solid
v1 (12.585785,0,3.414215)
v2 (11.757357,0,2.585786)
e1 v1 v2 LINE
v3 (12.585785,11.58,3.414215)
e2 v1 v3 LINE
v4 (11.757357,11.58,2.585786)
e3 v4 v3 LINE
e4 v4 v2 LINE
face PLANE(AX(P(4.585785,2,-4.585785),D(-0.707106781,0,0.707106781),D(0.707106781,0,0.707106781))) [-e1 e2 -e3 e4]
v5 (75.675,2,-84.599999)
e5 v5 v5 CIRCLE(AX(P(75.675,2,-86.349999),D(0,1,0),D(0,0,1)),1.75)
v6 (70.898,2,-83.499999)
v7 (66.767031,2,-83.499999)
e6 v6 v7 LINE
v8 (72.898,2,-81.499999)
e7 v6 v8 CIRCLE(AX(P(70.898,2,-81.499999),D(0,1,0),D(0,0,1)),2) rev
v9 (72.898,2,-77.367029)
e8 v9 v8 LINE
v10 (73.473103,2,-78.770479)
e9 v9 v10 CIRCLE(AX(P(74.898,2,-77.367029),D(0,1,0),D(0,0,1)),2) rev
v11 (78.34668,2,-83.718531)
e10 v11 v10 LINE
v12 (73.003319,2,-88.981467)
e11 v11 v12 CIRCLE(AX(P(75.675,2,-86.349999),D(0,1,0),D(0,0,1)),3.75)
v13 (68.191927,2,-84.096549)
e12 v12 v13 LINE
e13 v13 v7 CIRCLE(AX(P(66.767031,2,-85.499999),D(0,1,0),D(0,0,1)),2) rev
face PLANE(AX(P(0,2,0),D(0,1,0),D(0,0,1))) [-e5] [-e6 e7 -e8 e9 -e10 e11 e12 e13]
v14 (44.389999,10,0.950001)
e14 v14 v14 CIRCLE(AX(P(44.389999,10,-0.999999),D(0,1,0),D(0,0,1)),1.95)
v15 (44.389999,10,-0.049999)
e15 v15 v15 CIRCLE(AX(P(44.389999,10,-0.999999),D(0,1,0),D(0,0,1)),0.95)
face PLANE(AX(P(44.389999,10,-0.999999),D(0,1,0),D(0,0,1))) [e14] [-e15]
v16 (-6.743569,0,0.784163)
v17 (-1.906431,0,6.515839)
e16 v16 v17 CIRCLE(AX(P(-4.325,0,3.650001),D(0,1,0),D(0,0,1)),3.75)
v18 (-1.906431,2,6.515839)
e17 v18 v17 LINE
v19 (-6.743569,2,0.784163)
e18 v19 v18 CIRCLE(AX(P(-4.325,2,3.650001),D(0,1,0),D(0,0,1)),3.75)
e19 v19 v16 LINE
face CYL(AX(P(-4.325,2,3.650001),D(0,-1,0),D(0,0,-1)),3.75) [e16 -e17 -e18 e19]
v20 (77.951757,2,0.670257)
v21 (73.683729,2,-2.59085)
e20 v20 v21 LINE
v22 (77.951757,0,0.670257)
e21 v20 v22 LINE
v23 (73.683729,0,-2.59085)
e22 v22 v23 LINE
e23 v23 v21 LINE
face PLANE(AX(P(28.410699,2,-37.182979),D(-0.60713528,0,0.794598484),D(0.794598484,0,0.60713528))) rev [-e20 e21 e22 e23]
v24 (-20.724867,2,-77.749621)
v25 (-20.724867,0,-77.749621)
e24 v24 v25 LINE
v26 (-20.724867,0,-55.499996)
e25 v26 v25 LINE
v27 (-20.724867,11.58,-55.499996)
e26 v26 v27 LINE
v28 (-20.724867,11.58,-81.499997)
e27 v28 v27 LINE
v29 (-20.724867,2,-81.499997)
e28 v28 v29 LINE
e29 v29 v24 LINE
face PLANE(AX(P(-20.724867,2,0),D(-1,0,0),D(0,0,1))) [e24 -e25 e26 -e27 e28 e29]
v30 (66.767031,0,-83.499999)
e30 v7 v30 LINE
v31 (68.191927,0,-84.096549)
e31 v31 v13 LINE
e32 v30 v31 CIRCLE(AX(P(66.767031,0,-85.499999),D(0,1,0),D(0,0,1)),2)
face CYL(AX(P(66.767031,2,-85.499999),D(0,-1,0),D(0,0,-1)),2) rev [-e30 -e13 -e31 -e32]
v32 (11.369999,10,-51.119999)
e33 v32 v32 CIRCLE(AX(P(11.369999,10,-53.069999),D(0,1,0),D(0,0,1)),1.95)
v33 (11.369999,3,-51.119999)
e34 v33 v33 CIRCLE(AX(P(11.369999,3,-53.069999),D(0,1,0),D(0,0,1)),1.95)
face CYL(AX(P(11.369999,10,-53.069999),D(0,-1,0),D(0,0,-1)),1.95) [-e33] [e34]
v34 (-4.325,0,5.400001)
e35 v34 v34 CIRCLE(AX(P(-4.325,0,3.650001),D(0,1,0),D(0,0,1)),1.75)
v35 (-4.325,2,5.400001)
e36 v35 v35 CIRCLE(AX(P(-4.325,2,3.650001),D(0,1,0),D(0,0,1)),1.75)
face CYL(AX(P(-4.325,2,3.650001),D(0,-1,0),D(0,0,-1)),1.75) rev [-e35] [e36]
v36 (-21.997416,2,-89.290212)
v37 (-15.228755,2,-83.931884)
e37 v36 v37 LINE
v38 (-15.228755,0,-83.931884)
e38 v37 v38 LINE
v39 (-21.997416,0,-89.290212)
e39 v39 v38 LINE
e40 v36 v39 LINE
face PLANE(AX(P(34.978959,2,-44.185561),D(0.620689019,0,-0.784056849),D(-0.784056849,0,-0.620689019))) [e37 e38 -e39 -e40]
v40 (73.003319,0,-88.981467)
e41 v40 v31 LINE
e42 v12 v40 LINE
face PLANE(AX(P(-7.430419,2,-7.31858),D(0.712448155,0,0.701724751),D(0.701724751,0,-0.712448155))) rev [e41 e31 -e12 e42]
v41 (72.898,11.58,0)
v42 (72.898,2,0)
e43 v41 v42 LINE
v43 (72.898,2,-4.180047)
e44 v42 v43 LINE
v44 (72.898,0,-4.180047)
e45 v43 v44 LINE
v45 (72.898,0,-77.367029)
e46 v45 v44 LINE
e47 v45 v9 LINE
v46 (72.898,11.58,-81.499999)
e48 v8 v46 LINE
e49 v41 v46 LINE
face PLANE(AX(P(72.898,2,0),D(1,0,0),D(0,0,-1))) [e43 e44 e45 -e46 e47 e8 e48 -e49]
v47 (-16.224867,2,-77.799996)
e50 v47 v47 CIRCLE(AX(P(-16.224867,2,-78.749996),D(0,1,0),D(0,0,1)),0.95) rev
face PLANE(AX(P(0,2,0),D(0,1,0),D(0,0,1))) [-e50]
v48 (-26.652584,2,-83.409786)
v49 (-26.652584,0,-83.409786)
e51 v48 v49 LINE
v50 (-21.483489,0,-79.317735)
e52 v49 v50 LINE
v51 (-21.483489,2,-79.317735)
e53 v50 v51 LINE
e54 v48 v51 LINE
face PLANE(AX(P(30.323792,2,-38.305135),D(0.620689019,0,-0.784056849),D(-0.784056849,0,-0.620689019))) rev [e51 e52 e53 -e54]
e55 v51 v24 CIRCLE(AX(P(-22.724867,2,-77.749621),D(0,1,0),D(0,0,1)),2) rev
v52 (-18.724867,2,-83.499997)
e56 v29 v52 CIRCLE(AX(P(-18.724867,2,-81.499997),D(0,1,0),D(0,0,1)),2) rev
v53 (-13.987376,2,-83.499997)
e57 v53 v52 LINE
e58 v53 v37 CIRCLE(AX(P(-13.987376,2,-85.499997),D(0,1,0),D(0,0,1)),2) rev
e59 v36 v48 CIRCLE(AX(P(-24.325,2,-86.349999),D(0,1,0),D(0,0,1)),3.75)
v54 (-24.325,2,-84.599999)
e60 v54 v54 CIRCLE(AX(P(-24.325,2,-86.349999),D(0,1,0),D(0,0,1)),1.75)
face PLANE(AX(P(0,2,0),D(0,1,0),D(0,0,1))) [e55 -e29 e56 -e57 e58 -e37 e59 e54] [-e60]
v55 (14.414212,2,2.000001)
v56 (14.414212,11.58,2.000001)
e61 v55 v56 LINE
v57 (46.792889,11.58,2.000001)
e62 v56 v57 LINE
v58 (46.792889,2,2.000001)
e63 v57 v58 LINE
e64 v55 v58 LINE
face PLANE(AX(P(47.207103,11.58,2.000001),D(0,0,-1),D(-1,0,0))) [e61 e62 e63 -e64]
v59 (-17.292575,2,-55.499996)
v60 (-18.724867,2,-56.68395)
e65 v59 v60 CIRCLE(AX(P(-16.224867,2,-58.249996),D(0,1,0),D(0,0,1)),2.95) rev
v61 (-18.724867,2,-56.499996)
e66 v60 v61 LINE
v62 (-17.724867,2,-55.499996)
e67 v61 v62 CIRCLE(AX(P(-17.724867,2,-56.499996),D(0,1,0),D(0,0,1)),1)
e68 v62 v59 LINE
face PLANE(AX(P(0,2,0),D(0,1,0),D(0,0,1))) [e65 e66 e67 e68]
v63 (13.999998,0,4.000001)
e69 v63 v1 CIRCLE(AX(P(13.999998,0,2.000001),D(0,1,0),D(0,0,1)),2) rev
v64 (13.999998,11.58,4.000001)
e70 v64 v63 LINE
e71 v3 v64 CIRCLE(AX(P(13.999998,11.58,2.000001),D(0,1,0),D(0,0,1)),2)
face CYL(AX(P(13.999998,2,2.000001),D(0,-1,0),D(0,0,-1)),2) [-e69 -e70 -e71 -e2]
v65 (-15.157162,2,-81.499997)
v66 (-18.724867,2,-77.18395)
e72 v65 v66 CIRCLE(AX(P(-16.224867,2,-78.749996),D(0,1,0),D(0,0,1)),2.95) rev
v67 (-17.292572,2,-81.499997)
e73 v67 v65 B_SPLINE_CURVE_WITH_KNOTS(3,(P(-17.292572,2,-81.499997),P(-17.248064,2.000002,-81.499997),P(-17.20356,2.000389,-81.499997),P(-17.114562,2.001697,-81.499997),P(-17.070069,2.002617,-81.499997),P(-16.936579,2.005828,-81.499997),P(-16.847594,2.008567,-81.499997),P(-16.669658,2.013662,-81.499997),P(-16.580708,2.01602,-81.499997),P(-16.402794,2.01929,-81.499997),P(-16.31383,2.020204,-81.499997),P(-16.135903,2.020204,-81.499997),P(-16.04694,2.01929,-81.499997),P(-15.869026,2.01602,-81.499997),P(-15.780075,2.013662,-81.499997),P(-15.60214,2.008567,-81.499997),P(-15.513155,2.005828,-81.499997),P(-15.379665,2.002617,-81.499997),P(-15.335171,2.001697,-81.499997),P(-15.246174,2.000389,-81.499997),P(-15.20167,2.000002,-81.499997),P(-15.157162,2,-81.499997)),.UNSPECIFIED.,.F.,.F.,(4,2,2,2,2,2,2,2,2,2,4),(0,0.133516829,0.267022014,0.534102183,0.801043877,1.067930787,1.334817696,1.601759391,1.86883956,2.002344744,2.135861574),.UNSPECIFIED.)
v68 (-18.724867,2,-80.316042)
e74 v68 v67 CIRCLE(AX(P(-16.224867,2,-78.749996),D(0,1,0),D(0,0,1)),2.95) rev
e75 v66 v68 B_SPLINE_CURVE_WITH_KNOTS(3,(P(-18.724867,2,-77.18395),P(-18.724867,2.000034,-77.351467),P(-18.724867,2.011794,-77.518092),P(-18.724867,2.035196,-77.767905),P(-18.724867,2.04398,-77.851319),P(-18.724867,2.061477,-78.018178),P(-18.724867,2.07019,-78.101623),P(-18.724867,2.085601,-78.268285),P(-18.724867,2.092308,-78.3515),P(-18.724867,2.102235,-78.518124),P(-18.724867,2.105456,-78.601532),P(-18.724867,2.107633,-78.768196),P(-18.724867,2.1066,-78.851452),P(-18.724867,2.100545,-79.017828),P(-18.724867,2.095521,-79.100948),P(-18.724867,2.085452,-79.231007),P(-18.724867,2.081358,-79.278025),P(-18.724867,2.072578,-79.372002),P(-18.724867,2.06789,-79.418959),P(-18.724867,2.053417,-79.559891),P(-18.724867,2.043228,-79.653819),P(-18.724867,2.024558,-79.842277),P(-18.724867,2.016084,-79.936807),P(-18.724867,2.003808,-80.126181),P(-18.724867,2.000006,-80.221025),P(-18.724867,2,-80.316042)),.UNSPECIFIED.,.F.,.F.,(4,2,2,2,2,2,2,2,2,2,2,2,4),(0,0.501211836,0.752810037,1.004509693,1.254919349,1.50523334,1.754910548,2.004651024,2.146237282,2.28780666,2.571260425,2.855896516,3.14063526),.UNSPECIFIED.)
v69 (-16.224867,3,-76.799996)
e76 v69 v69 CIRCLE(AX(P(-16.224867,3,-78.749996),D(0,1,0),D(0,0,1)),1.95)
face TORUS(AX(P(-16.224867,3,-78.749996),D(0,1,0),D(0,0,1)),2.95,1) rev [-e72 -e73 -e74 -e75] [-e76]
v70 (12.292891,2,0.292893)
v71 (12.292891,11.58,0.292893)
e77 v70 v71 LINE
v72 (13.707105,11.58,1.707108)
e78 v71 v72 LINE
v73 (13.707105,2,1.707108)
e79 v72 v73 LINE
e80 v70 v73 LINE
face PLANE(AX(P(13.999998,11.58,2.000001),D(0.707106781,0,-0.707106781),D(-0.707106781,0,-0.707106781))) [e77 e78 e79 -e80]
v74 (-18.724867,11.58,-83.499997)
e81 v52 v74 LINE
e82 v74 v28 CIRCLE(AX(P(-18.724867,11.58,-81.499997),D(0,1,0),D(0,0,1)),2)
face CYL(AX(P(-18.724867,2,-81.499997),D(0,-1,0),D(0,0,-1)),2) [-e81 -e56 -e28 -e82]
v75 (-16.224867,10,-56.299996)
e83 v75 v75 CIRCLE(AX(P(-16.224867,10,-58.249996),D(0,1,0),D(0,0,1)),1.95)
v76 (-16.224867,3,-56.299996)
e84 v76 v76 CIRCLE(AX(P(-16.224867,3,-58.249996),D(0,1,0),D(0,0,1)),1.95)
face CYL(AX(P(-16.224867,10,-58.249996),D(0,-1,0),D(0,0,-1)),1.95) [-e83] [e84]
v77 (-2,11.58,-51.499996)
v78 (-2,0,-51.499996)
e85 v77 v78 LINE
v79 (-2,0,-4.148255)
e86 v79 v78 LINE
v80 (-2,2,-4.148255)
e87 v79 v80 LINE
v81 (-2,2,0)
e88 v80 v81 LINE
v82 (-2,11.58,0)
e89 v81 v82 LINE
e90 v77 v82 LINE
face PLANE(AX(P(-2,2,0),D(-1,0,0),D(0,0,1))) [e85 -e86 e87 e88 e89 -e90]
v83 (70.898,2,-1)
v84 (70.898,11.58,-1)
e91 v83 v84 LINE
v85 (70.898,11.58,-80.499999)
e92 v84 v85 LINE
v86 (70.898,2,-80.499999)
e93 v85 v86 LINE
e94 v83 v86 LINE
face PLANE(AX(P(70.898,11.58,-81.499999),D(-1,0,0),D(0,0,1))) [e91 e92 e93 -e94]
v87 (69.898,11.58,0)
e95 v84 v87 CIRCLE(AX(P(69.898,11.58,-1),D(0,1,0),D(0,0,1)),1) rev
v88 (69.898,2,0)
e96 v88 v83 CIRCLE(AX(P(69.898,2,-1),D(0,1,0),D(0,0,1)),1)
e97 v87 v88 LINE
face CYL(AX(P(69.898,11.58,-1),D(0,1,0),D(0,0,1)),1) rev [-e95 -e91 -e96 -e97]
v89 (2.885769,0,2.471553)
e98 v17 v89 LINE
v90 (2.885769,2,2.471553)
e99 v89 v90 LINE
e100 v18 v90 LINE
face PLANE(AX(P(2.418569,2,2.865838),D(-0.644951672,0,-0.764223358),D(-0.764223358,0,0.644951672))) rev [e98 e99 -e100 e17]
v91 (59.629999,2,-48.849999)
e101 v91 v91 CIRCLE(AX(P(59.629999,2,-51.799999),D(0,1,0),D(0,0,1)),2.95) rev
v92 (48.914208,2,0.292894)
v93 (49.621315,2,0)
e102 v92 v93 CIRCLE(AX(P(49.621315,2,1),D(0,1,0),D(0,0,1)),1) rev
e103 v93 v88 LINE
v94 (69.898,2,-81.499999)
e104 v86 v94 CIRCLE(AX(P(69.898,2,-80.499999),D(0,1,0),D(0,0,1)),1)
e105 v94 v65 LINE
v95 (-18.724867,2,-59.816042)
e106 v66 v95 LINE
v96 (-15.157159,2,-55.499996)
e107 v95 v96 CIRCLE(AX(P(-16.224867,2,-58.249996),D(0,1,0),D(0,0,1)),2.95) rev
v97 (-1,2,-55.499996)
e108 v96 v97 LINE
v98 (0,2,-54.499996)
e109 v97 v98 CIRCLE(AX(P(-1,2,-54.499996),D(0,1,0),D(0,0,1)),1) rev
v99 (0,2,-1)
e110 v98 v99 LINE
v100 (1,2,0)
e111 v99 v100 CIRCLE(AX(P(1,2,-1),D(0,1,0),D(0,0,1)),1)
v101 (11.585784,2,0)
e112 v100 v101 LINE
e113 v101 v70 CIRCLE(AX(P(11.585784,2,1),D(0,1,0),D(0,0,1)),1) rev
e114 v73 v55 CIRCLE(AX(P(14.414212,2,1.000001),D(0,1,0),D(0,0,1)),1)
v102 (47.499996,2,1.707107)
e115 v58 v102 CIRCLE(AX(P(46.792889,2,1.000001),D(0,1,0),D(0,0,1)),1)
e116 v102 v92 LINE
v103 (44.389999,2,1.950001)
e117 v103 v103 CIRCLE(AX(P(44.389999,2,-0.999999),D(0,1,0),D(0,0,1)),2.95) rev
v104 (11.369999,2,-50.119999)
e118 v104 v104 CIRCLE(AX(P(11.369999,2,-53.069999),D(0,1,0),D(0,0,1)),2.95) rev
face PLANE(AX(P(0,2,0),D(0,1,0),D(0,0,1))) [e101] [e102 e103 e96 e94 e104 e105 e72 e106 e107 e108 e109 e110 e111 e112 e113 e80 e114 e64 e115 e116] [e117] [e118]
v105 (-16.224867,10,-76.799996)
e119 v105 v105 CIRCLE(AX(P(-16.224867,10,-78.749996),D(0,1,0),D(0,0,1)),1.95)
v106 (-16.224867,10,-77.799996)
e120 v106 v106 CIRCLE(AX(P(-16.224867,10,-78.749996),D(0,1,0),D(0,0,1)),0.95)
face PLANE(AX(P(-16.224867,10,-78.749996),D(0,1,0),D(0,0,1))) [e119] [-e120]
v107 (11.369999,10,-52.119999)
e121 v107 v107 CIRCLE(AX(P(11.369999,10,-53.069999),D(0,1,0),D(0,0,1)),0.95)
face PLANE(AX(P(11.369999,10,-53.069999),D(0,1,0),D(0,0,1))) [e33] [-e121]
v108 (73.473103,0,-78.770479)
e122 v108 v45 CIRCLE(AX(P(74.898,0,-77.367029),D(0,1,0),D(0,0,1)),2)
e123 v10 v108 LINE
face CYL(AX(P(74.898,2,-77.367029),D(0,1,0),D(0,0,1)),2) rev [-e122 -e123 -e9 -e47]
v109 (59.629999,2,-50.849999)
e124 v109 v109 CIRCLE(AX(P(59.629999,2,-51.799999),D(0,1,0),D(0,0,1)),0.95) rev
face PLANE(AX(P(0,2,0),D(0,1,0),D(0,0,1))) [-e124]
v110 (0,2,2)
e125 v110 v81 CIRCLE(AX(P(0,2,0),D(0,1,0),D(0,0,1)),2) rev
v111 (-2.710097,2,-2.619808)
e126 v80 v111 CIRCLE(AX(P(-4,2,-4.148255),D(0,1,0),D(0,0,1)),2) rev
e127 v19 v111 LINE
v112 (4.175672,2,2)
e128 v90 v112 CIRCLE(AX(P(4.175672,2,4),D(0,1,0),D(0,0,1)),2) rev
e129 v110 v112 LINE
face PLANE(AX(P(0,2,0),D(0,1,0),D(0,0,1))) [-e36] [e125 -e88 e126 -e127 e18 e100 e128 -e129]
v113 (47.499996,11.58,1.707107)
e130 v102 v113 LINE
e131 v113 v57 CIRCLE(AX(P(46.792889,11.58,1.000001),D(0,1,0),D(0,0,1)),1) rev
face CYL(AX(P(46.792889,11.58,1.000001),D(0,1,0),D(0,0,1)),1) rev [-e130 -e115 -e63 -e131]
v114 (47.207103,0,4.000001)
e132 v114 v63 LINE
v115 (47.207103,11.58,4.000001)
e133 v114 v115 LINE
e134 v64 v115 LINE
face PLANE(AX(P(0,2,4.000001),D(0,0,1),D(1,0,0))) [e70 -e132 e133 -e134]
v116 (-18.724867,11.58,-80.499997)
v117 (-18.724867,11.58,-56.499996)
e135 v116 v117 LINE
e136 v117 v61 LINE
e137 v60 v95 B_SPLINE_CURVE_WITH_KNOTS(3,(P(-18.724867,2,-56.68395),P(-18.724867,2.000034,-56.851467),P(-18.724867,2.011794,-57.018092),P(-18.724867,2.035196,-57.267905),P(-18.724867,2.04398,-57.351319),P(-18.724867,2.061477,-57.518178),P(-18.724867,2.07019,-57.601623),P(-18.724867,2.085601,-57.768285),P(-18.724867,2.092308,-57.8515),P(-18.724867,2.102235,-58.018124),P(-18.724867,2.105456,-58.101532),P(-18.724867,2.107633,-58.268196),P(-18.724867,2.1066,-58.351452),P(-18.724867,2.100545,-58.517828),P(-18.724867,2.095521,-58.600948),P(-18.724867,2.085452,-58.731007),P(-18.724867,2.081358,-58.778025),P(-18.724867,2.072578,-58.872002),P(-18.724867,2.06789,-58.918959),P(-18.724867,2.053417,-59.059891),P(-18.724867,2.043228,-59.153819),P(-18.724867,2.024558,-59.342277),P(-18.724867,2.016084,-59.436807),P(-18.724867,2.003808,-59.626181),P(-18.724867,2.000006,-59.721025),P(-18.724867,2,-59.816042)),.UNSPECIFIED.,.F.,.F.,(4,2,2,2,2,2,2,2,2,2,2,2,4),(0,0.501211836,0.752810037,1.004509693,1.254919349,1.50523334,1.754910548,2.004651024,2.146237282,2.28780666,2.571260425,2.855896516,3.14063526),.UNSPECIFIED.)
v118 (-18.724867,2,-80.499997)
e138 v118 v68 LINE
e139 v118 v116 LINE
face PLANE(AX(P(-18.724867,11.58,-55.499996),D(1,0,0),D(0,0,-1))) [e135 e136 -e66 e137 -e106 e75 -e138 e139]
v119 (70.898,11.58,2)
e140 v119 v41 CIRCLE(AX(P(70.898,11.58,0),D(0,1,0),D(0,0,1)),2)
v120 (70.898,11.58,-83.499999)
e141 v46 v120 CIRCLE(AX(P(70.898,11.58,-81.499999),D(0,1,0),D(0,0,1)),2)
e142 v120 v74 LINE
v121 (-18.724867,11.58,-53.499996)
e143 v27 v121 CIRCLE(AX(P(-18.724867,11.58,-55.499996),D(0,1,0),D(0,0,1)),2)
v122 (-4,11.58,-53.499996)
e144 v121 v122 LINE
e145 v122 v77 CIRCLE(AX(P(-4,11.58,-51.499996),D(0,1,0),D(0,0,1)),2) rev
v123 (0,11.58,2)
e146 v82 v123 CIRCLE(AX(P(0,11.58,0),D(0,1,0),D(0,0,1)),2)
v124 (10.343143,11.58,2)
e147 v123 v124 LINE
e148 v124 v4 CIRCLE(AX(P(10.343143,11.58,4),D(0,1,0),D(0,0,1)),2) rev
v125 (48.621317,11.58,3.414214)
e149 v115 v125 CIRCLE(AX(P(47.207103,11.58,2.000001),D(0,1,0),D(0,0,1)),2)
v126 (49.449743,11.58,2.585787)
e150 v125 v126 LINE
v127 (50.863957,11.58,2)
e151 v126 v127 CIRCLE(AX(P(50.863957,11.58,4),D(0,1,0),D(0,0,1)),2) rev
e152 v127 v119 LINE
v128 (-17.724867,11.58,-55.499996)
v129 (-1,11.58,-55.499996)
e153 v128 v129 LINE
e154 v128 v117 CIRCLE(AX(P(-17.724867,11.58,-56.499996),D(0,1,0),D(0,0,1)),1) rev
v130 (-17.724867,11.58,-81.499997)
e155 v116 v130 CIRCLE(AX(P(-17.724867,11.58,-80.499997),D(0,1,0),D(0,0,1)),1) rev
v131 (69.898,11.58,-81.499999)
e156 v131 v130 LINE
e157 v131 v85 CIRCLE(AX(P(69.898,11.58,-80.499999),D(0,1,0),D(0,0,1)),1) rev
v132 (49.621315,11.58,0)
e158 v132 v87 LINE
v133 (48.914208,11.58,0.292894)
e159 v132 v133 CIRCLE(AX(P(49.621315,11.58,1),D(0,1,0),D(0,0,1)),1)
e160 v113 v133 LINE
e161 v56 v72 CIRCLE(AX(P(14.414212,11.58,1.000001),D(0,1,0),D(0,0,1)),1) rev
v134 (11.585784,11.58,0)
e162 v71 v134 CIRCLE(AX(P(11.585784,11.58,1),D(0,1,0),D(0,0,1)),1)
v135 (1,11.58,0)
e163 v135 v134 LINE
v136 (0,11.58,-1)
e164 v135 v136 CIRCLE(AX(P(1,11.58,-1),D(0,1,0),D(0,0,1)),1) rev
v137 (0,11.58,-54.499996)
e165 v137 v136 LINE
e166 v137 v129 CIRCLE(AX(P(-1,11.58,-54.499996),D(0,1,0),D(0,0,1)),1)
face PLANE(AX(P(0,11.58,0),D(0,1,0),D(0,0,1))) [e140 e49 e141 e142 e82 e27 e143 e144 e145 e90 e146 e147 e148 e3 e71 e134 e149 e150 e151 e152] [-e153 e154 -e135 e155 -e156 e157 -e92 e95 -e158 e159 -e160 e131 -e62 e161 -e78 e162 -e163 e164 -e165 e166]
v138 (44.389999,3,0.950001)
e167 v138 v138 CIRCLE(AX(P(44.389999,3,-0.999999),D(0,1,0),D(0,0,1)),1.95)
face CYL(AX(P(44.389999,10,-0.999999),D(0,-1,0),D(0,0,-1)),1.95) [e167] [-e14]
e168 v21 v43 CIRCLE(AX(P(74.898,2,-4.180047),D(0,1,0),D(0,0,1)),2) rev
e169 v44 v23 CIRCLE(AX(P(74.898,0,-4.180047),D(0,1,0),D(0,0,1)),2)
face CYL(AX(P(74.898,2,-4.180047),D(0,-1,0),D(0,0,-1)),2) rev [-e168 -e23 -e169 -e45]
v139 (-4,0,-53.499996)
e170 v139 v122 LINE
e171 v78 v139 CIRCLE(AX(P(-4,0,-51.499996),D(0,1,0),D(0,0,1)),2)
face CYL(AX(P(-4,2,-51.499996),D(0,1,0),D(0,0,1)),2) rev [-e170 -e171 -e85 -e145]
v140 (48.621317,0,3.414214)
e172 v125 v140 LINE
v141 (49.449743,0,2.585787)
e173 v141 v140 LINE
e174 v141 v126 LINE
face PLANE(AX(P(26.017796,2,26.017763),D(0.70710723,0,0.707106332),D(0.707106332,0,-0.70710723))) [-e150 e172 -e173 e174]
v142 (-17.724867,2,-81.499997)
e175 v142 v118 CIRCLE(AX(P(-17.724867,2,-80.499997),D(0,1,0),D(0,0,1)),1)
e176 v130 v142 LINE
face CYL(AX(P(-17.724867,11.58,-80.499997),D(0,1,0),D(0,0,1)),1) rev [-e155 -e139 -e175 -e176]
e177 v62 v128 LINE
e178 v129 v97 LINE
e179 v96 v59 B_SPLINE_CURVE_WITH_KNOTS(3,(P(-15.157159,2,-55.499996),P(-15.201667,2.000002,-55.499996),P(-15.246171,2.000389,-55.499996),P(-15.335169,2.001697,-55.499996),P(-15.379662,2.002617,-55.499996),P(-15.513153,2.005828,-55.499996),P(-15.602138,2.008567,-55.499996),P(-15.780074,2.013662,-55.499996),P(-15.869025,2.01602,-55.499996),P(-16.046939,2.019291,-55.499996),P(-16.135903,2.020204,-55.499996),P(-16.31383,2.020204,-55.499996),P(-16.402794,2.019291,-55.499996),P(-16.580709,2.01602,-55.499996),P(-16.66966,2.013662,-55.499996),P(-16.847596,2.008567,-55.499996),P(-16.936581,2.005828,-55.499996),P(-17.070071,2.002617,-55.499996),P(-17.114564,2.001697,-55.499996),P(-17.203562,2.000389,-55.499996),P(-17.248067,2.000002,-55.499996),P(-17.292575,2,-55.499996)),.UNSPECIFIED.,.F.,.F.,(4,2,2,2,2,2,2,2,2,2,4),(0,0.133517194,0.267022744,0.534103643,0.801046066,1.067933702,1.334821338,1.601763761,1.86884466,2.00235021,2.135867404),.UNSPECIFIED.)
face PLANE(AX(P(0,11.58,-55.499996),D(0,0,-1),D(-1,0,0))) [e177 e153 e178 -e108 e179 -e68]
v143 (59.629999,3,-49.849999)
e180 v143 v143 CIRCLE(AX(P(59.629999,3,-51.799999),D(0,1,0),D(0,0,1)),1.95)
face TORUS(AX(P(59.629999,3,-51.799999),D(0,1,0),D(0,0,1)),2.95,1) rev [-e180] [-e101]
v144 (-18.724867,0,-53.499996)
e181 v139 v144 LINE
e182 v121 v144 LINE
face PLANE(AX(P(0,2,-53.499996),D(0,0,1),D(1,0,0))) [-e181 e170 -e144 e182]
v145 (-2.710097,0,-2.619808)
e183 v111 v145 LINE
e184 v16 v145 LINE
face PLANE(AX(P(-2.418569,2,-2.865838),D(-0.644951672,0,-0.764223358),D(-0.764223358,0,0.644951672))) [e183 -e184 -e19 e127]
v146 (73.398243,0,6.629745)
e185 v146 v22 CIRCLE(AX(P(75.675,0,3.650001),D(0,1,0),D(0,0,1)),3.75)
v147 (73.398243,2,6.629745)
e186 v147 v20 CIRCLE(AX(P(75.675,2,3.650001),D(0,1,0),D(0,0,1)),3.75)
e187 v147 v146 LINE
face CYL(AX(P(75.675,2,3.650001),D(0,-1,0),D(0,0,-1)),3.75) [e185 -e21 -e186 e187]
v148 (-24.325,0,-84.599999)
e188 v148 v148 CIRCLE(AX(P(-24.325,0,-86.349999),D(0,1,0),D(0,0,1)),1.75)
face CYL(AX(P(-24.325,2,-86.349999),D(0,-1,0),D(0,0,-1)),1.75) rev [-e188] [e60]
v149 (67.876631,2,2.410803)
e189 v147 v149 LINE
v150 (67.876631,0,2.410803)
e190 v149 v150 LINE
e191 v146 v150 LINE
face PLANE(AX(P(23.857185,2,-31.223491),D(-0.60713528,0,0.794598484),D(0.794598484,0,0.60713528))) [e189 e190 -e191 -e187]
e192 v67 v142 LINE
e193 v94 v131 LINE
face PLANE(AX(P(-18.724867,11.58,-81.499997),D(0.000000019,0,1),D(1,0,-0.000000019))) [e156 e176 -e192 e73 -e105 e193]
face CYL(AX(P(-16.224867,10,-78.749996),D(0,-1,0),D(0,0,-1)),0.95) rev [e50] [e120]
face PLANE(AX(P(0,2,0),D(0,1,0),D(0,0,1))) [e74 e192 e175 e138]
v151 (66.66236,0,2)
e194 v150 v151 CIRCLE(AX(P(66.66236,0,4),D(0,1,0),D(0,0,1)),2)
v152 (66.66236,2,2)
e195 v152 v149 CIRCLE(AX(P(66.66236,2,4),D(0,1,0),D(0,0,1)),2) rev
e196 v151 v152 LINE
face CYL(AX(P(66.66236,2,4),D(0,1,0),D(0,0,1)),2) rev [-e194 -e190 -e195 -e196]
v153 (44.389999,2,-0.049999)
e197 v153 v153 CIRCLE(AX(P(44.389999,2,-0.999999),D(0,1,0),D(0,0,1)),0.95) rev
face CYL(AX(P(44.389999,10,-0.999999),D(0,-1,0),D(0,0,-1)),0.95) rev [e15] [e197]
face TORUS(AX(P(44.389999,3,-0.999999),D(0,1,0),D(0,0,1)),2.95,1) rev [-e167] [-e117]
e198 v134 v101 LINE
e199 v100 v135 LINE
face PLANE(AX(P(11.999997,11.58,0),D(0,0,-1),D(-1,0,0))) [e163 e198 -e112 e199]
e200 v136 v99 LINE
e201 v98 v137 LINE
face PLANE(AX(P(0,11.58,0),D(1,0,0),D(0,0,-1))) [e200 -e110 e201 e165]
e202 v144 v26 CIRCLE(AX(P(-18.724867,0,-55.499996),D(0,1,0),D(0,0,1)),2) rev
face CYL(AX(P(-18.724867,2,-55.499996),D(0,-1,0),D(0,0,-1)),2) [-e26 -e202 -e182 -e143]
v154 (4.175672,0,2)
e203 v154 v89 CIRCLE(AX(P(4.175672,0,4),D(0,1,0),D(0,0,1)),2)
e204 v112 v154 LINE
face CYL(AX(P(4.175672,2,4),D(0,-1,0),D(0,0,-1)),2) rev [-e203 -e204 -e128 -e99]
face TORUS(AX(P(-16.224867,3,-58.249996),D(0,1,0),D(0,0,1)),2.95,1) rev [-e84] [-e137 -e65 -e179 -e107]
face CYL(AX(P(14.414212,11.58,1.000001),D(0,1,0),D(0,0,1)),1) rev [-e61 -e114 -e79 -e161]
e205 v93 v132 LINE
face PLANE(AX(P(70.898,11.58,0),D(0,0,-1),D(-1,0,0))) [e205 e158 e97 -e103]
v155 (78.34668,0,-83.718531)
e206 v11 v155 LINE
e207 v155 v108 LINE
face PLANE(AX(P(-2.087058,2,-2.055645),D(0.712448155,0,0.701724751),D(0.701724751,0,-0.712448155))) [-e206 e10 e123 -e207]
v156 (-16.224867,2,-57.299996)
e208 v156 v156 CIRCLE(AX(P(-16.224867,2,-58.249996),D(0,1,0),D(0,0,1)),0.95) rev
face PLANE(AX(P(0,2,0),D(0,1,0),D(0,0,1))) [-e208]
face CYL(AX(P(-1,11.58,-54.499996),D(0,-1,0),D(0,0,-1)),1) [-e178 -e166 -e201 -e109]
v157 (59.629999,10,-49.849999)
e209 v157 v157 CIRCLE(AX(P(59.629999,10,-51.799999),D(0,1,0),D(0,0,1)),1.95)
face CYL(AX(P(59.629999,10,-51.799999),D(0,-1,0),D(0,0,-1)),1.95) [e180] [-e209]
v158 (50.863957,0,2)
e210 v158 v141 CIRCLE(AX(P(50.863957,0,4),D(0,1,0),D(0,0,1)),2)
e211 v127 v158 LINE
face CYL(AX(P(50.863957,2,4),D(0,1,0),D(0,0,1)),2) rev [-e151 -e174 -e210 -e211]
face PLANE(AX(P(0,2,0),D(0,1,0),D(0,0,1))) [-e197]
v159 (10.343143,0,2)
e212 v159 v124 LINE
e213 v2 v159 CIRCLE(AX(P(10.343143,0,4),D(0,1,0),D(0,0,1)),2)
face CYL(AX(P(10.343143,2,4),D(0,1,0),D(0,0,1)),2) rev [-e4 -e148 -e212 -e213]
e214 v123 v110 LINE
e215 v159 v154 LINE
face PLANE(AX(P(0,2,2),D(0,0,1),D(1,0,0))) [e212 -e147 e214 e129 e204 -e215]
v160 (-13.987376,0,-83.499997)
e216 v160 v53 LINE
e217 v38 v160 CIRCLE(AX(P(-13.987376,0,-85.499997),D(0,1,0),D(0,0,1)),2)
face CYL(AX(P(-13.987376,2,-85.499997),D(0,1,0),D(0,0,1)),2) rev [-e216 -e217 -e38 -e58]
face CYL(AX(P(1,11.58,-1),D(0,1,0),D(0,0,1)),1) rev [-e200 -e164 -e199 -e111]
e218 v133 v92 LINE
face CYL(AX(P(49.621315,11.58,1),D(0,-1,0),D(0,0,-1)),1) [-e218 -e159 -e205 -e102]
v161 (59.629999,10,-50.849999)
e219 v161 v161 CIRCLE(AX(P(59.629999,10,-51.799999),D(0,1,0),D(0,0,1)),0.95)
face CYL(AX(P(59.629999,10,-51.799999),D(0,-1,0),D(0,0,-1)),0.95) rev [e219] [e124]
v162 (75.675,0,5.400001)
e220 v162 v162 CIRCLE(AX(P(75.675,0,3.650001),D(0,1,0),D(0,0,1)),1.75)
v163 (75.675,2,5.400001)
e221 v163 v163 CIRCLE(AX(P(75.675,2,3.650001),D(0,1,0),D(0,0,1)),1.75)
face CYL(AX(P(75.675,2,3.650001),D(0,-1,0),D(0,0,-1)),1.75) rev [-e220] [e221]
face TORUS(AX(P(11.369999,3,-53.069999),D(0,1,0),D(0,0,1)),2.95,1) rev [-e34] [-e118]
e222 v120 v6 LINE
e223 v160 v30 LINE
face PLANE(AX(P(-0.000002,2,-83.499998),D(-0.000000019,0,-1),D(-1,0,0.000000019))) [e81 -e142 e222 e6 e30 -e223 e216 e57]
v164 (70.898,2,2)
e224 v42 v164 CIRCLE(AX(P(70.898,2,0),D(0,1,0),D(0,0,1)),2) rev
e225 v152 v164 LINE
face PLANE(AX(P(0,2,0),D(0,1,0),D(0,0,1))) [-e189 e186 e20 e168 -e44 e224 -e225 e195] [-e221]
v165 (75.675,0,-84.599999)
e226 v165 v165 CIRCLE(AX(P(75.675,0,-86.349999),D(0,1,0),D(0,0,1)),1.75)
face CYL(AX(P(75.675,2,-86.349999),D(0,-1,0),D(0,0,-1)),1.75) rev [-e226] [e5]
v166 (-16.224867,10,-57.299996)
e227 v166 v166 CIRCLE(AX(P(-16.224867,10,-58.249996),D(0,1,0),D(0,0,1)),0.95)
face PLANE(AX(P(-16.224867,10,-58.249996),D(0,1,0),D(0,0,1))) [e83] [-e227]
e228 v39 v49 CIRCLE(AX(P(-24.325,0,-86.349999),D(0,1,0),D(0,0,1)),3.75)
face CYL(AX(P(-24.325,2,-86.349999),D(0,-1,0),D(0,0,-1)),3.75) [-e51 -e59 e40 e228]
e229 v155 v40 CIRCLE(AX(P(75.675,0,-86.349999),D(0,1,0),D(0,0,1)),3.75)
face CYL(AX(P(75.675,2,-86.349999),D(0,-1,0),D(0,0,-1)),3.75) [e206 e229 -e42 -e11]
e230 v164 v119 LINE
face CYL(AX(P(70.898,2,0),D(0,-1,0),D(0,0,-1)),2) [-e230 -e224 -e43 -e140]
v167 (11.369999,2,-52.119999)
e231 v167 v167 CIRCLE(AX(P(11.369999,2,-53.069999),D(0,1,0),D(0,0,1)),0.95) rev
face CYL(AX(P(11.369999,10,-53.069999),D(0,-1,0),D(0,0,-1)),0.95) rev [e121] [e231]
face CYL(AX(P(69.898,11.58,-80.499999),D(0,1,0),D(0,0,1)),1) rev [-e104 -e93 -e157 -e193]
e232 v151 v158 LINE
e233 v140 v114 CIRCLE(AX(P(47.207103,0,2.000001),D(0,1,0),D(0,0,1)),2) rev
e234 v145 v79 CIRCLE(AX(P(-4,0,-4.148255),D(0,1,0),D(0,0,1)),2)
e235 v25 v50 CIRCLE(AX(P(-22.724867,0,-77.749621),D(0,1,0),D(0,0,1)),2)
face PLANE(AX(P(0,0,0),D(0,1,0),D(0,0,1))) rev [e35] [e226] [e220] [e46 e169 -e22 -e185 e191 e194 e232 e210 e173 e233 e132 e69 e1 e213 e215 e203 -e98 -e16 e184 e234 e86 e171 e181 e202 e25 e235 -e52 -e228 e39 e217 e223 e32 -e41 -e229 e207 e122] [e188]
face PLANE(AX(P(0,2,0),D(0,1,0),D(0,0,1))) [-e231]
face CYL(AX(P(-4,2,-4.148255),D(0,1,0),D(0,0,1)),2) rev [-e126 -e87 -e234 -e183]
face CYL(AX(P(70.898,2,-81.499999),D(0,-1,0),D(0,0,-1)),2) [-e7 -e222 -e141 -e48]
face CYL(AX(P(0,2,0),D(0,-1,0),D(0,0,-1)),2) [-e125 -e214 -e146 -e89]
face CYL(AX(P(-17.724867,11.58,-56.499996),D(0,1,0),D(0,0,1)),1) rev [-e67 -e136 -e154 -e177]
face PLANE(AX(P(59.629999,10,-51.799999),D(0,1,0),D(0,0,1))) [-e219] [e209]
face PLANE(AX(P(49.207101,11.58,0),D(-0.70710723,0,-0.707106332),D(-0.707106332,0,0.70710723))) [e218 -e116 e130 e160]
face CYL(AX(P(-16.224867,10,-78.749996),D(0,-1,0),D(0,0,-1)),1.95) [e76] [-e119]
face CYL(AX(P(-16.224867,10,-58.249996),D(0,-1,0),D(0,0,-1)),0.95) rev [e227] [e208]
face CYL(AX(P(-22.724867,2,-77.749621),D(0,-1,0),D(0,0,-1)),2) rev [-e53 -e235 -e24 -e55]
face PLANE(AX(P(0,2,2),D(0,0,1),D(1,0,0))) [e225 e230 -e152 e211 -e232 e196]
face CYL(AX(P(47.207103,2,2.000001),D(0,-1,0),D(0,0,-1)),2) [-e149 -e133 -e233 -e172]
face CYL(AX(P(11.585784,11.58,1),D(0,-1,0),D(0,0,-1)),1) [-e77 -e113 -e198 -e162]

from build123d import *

# Parameters (mm, degrees)
CROQUIS2_R              = 1.7500000000001112
CROQUIS2_R_2            = 1.7499999999999087
CROQUIS2_R_3            = 1.7499999999999079
SALIENTE_EXTRUIR1_DEPTH = 2
SALIENTE_EXTRUIR2_DEPTH = 9.58
CROQUIS4_R              = 1.9500000000000126
CROQUIS4_R_2            = 0.9500000000000127
CROQUIS4_R_3            = 1.9500000000000106
CROQUIS4_R_4            = 1.9500000000282933
CROQUIS4_R_5            = 0.9500000000282915
CROQUIS4_R_6            = 1.9500000000282898
CROQUIS4_R_7            = 0.9500000000282917
SALIENTE_EXTRUIR3_DEPTH = 8
REDONDEO2_R             = 2
REDONDEO3_R             = 1
REDONDEO4_R             = 1


with BuildPart() as part:
    # Croquis2 → Saliente-Extruir1 (new body)
    with BuildSketch(Plane(origin=(0, 0, 0), x_dir=(1, 0, 0), z_dir=(0, 1, 0))):
        with BuildLine():
            Line((-2, 3.2190806926623328), (-2.0000000000000036, 53.499996259679165))
            Line((-2.0000000000000036, 53.499996259679165), (-20.72486671913368, 53.499996259679165))
            Line((-20.72486671913368, 53.499996259679165), (-20.724866719133683, 78.71718084511275))
            Line((-20.724866719133683, 78.71718084511275), (-26.65258397030698, 83.40978573734104))
            ThreePointArc((-26.65258397030698, 83.40978573734104), (-27.26521333266674, 88.67758274029933), (-21.997416329708454, 89.29021210265908))
            Line((-21.997416329708454, 89.29021210265908), (-14.68319400447552, 83.49999741935251))
            Line((-14.68319400447552, 83.49999741935251), (67.60435576823176, 83.4999990027656))
            Line((67.60435576823176, 83.4999990027656), (73.00331926973067, 88.98146673797802))
            ThreePointArc((73.00331926973067, 88.98146673797802), (78.30646766797027, 89.0216795002617), (78.34668043025394, 83.7185311020221))
            Line((78.34668043025394, 83.7185311020221), (72.89799970000735, 78.18658638447984))
            Line((72.89799970000735, 78.18658638447984), (72.89799970000736, 3.1912085024608796))
            Line((72.89799970000736, 3.1912085024608796), (77.95175715170296, -0.6702567639373589))
            ThreePointArc((77.95175715170296, -0.6702567639373589), (78.65474416605473, -5.926758381710474), (73.39824254828162, -6.6297453960622414))
            Line((73.39824254828162, -6.6297453960622414), (67.3389855873542, -2.000000000000001))
            Line((67.3389855873542, -2.000000000000001), (50.03552927587822, -2))
            Line((50.03552927587822, -2), (48.03553073587499, -4.000001079999869))
            Line((48.03553073587499, -4.000001079999869), (13.171571275261055, -4.000001079999869))
            Line((13.171571275261055, -4.000001079999869), (11.171570195261186, -2))
            Line((11.171570195261186, -2), (3.444526744807529, -2.0000000000000018))
            Line((3.444526744807529, -2.0000000000000018), (-1.9064313781813695, -6.515838670643353))
            ThreePointArc((-1.9064313781813695, -6.515838670643353), (-7.190837740651284, -6.068569851826156), (-6.743568921834085, -0.7841634893562427))
            Line((-6.743568921834085, -0.7841634893562427), (-2, 3.2190806926623328))
        make_face()
        with Locations(Location((75.6749998499923, 86.34999892000006, 0), (0, 0, 270))):
            Circle(CROQUIS2_R, mode=Mode.SUBTRACT)
        with Locations(Location((75.67499984999229, -3.6500010799997984, 0), (0, 0, 270))):
            Circle(CROQUIS2_R_2, mode=Mode.SUBTRACT)
        with Locations(Location((-4.325000150007727, -3.6500010799997984, 0), (0, 0, 270))):
            Circle(CROQUIS2_R_3, mode=Mode.SUBTRACT)
        with Locations(Location((-24.325000150007718, 86.34999892000006, 0), (0, 0, 270))):
            Circle(CROQUIS2_R, mode=Mode.SUBTRACT)
    extrude(amount=SALIENTE_EXTRUIR1_DEPTH)

    # Croquis3 → Saliente-Extruir2 (add)
    with BuildSketch(Plane(origin=(0, 2, 0), x_dir=(1, 0, 0), z_dir=(0, 1, 0))):
        Polygon((-20.72486671913368, 83.49999730309598), (72.89799970000735, 83.49999910462824), (72.89799970000735, -2), (50.03552927587822, -2), (48.03553073587499, -4.000001079999869), (13.171571275261055, -4.000001079999869), (11.171570195261186, -2), (-2.0000000000000036, -2), (-2.0000000000000036, 53.499996259679165), (-20.72486671913368, 53.499996259679165), align=None)
        Polygon((70.89799970000735, 81.49999906614336), (70.89799970000736, 0), (49.20710140718407, 0), (47.20710286718084, -2.000001079999869), (13.999998400007245, -2.000001079999869), (11.99999732000738, 0), (-3.47e-15, 0), (-3.47e-15, 55.499996259679165), (-18.72486671913368, 55.499996259679165), (-18.72486671913368, 81.49999734158087), align=None, mode=Mode.SUBTRACT)
    extrude(amount=SALIENTE_EXTRUIR2_DEPTH)

    # Croquis4 → Saliente-Extruir3 (add)
    # profile 1 of 5: a face of its own
    with BuildSketch(Plane(origin=(0, 2, 0), x_dir=(1, 0, 0), z_dir=(0, 1, 0))):
        with Locations(Location((-16.224866719133676, 78.74999625967915, 0), (0, 0, 270))):
            Circle(CROQUIS4_R)
        with Locations(Location((-16.224866719133676, 78.74999625967915, 0), (0, 0, 270))):
            Circle(CROQUIS4_R_2, mode=Mode.SUBTRACT)
    # profile 2 of 5: a face of its own
    with BuildSketch(Plane(origin=(0, 2, 0), x_dir=(1, 0, 0), z_dir=(0, 1, 0))):
        with Locations(Location((-16.22486671913367, 58.24999625967897, 0), (0, 0, 270))):
            Circle(CROQUIS4_R_3)
        with Locations(Location((-16.22486671913367, 58.24999625967897, 0), (0, 0, 270))):
            Circle(CROQUIS4_R_2, mode=Mode.SUBTRACT)
    # profile 3 of 5: a face of its own
    with BuildSketch(Plane(origin=(0, 2, 0), x_dir=(1, 0, 0), z_dir=(0, 1, 0))):
        with Locations(Location((11.369998580007247, 53.06999900000009, 0), (0, 0, 270))):
            Circle(CROQUIS4_R_4)
        with Locations(Location((11.369998580007247, 53.06999900000009, 0), (0, 0, 270))):
            Circle(CROQUIS4_R_5, mode=Mode.SUBTRACT)
    # profile 4 of 5: a face of its own
    with BuildSketch(Plane(origin=(0, 2, 0), x_dir=(1, 0, 0), z_dir=(0, 1, 0))):
        with Locations(Location((59.62999858000725, 51.799998999999985, 0), (0, 0, 270))):
            Circle(CROQUIS4_R_6)
        with Locations(Location((59.62999858000725, 51.799998999999985, 0), (0, 0, 270))):
            Circle(CROQUIS4_R_5, mode=Mode.SUBTRACT)
    # profile 5 of 5: a face of its own
    with BuildSketch(Plane(origin=(0, 2, 0), x_dir=(1, 0, 0), z_dir=(0, 1, 0))):
        with Locations(Location((44.38999858000725, 0.9999990000000292, 0), (0, 0, 270))):
            Circle(CROQUIS4_R_6)
        with Locations(Location((44.38999858000725, 0.9999990000000292, 0), (0, 0, 270))):
            Circle(CROQUIS4_R_7, mode=Mode.SUBTRACT)
    extrude(amount=SALIENTE_EXTRUIR3_DEPTH)

    # Redondeo2
    redondeo2_edges = [part.edges().sort_by_distance(p)[0] for p in [
        (-2, 1, -3.2190806926623328),
        (-2.0000000000000036, 5.79, -53.499996259679165),
        (-20.72486671913368, 5.79, -53.499996259679165),
        (-20.724866719133683, 1, -78.71718084511275),
        (-14.68319400447552, 1, -83.49999741935251),
        (67.60435576823176, 1, -83.4999990027656),
        (72.89799970000735, 1, -78.18658638447984),
        (72.89799970000736, 1, -3.1912085024608796),
        (67.3389855873542, 1, 2.000000000000001),
        (50.03552927587822, 5.79, 2),
        (48.03553073587499, 5.79, 4.000001079999869),
        (13.171571275261055, 5.79, 4.000001079999869),
        (11.171570195261186, 5.79, 2),
        (3.444526744807529, 1, 2.0000000000000018),
        (-20.72486671913368, 6.79, -83.49999730309598),
        (-2.0000000000000036, 6.79, 2),
        (72.89799970000735, 6.79, 2),
        (72.89799970000735, 6.79, -83.49999910462824),
    ]]
    fillet(redondeo2_edges, radius=REDONDEO2_R)

    # Redondeo3
    redondeo3_edges = [part.edges().sort_by_distance(p)[0] for p in [
        (-3.47e-15, 6.79, -55.499996259679165),
        (-3.47e-15, 6.79, 0),
        (11.99999732000738, 6.79, 0),
        (13.999998400007245, 6.79, 2.000001079999869),
        (47.20710286718084, 6.79, 2.000001079999869),
        (49.20710140718407, 6.79, 0),
        (70.89799970000736, 6.79, 0),
        (70.89799970000735, 6.79, -81.49999906614336),
        (-18.72486671913368, 6.79, -81.49999734158087),
        (-18.72486671913368, 6.79, -55.499996259679165),
    ]]
    fillet(redondeo3_edges, radius=REDONDEO3_R)

    # Redondeo4
    # the kernel refuses this fillet: 1 mm, written as the material it adds along each edge
    with BuildSketch(Plane(origin=(-16.224866719133676, 2, -78.74999625967915), x_dir=(0, 0, 1), z_dir=(-1, 0, 0))) as redondeo4_piece_1:
        with BuildLine():
            CenterArc((1.950000000000017 + REDONDEO4_R, REDONDEO4_R), REDONDEO4_R, 180, 90)
            Line((1.950000000000017, REDONDEO4_R), (1.950000000000017, 0))
            Line((1.950000000000017, 0), (1.950000000000017 + REDONDEO4_R, 0))
        make_face()
    revolve(axis=Axis((-16.224866719133676, 2, -78.74999625967915), (0, 1, 0)))
    with BuildSketch(Plane(origin=(-16.22486671913367, 2, -58.24999625967897), x_dir=(0, 0, 1), z_dir=(-1, 0, 0))) as redondeo4_piece_2:
        with BuildLine():
            CenterArc((1.95000000000001 + REDONDEO4_R, REDONDEO4_R), REDONDEO4_R, 180, 90)
            Line((1.95000000000001, REDONDEO4_R), (1.95000000000001, 0))
            Line((1.95000000000001, 0), (1.95000000000001 + REDONDEO4_R, 0))
        make_face()
    revolve(axis=Axis((-16.22486671913367, 2, -58.24999625967897), (0, 1, 0)))
    with BuildSketch(Plane(origin=(11.369998580007247, 2, -53.06999900000009), x_dir=(0, 0, 1), z_dir=(-1, 0, 0))) as redondeo4_piece_3:
        with BuildLine():
            CenterArc((1.9500000000282967 + REDONDEO4_R, REDONDEO4_R), REDONDEO4_R, 180, 90)
            Line((1.9500000000282967, REDONDEO4_R), (1.9500000000282967, 0))
            Line((1.9500000000282967, 0), (1.9500000000282967 + REDONDEO4_R, 0))
        make_face()
    revolve(axis=Axis((11.369998580007247, 2, -53.06999900000009), (0, 1, 0)))
    with BuildSketch(Plane(origin=(59.62999858000725, 2, -51.799998999999985), x_dir=(0, 0, 1), z_dir=(-1, 0, 0))) as redondeo4_piece_4:
        with BuildLine():
            CenterArc((1.9500000000282895 + REDONDEO4_R, REDONDEO4_R), REDONDEO4_R, 180, 90)
            Line((1.9500000000282895, REDONDEO4_R), (1.9500000000282895, 0))
            Line((1.9500000000282895, 0), (1.9500000000282895 + REDONDEO4_R, 0))
        make_face()
    revolve(axis=Axis((59.62999858000725, 2, -51.799998999999985), (0, 1, 0)))
    with BuildSketch(Plane(origin=(44.38999858000725, 2, -0.9999990000000292), x_dir=(0, 0, 1), z_dir=(-1, 0, 0))) as redondeo4_piece_5:
        with BuildLine():
            CenterArc((1.9500000000282898 + REDONDEO4_R, REDONDEO4_R), REDONDEO4_R, 180, 90)
            Line((1.9500000000282878, REDONDEO4_R), (1.9500000000282898, 0))
            Line((1.9500000000282898, 0), (1.9500000000282898 + REDONDEO4_R, 0))
        make_face()
    revolve(axis=Axis((44.38999858000725, 2, -0.9999990000000292), (0, 1, 0)))


solid = part.part
